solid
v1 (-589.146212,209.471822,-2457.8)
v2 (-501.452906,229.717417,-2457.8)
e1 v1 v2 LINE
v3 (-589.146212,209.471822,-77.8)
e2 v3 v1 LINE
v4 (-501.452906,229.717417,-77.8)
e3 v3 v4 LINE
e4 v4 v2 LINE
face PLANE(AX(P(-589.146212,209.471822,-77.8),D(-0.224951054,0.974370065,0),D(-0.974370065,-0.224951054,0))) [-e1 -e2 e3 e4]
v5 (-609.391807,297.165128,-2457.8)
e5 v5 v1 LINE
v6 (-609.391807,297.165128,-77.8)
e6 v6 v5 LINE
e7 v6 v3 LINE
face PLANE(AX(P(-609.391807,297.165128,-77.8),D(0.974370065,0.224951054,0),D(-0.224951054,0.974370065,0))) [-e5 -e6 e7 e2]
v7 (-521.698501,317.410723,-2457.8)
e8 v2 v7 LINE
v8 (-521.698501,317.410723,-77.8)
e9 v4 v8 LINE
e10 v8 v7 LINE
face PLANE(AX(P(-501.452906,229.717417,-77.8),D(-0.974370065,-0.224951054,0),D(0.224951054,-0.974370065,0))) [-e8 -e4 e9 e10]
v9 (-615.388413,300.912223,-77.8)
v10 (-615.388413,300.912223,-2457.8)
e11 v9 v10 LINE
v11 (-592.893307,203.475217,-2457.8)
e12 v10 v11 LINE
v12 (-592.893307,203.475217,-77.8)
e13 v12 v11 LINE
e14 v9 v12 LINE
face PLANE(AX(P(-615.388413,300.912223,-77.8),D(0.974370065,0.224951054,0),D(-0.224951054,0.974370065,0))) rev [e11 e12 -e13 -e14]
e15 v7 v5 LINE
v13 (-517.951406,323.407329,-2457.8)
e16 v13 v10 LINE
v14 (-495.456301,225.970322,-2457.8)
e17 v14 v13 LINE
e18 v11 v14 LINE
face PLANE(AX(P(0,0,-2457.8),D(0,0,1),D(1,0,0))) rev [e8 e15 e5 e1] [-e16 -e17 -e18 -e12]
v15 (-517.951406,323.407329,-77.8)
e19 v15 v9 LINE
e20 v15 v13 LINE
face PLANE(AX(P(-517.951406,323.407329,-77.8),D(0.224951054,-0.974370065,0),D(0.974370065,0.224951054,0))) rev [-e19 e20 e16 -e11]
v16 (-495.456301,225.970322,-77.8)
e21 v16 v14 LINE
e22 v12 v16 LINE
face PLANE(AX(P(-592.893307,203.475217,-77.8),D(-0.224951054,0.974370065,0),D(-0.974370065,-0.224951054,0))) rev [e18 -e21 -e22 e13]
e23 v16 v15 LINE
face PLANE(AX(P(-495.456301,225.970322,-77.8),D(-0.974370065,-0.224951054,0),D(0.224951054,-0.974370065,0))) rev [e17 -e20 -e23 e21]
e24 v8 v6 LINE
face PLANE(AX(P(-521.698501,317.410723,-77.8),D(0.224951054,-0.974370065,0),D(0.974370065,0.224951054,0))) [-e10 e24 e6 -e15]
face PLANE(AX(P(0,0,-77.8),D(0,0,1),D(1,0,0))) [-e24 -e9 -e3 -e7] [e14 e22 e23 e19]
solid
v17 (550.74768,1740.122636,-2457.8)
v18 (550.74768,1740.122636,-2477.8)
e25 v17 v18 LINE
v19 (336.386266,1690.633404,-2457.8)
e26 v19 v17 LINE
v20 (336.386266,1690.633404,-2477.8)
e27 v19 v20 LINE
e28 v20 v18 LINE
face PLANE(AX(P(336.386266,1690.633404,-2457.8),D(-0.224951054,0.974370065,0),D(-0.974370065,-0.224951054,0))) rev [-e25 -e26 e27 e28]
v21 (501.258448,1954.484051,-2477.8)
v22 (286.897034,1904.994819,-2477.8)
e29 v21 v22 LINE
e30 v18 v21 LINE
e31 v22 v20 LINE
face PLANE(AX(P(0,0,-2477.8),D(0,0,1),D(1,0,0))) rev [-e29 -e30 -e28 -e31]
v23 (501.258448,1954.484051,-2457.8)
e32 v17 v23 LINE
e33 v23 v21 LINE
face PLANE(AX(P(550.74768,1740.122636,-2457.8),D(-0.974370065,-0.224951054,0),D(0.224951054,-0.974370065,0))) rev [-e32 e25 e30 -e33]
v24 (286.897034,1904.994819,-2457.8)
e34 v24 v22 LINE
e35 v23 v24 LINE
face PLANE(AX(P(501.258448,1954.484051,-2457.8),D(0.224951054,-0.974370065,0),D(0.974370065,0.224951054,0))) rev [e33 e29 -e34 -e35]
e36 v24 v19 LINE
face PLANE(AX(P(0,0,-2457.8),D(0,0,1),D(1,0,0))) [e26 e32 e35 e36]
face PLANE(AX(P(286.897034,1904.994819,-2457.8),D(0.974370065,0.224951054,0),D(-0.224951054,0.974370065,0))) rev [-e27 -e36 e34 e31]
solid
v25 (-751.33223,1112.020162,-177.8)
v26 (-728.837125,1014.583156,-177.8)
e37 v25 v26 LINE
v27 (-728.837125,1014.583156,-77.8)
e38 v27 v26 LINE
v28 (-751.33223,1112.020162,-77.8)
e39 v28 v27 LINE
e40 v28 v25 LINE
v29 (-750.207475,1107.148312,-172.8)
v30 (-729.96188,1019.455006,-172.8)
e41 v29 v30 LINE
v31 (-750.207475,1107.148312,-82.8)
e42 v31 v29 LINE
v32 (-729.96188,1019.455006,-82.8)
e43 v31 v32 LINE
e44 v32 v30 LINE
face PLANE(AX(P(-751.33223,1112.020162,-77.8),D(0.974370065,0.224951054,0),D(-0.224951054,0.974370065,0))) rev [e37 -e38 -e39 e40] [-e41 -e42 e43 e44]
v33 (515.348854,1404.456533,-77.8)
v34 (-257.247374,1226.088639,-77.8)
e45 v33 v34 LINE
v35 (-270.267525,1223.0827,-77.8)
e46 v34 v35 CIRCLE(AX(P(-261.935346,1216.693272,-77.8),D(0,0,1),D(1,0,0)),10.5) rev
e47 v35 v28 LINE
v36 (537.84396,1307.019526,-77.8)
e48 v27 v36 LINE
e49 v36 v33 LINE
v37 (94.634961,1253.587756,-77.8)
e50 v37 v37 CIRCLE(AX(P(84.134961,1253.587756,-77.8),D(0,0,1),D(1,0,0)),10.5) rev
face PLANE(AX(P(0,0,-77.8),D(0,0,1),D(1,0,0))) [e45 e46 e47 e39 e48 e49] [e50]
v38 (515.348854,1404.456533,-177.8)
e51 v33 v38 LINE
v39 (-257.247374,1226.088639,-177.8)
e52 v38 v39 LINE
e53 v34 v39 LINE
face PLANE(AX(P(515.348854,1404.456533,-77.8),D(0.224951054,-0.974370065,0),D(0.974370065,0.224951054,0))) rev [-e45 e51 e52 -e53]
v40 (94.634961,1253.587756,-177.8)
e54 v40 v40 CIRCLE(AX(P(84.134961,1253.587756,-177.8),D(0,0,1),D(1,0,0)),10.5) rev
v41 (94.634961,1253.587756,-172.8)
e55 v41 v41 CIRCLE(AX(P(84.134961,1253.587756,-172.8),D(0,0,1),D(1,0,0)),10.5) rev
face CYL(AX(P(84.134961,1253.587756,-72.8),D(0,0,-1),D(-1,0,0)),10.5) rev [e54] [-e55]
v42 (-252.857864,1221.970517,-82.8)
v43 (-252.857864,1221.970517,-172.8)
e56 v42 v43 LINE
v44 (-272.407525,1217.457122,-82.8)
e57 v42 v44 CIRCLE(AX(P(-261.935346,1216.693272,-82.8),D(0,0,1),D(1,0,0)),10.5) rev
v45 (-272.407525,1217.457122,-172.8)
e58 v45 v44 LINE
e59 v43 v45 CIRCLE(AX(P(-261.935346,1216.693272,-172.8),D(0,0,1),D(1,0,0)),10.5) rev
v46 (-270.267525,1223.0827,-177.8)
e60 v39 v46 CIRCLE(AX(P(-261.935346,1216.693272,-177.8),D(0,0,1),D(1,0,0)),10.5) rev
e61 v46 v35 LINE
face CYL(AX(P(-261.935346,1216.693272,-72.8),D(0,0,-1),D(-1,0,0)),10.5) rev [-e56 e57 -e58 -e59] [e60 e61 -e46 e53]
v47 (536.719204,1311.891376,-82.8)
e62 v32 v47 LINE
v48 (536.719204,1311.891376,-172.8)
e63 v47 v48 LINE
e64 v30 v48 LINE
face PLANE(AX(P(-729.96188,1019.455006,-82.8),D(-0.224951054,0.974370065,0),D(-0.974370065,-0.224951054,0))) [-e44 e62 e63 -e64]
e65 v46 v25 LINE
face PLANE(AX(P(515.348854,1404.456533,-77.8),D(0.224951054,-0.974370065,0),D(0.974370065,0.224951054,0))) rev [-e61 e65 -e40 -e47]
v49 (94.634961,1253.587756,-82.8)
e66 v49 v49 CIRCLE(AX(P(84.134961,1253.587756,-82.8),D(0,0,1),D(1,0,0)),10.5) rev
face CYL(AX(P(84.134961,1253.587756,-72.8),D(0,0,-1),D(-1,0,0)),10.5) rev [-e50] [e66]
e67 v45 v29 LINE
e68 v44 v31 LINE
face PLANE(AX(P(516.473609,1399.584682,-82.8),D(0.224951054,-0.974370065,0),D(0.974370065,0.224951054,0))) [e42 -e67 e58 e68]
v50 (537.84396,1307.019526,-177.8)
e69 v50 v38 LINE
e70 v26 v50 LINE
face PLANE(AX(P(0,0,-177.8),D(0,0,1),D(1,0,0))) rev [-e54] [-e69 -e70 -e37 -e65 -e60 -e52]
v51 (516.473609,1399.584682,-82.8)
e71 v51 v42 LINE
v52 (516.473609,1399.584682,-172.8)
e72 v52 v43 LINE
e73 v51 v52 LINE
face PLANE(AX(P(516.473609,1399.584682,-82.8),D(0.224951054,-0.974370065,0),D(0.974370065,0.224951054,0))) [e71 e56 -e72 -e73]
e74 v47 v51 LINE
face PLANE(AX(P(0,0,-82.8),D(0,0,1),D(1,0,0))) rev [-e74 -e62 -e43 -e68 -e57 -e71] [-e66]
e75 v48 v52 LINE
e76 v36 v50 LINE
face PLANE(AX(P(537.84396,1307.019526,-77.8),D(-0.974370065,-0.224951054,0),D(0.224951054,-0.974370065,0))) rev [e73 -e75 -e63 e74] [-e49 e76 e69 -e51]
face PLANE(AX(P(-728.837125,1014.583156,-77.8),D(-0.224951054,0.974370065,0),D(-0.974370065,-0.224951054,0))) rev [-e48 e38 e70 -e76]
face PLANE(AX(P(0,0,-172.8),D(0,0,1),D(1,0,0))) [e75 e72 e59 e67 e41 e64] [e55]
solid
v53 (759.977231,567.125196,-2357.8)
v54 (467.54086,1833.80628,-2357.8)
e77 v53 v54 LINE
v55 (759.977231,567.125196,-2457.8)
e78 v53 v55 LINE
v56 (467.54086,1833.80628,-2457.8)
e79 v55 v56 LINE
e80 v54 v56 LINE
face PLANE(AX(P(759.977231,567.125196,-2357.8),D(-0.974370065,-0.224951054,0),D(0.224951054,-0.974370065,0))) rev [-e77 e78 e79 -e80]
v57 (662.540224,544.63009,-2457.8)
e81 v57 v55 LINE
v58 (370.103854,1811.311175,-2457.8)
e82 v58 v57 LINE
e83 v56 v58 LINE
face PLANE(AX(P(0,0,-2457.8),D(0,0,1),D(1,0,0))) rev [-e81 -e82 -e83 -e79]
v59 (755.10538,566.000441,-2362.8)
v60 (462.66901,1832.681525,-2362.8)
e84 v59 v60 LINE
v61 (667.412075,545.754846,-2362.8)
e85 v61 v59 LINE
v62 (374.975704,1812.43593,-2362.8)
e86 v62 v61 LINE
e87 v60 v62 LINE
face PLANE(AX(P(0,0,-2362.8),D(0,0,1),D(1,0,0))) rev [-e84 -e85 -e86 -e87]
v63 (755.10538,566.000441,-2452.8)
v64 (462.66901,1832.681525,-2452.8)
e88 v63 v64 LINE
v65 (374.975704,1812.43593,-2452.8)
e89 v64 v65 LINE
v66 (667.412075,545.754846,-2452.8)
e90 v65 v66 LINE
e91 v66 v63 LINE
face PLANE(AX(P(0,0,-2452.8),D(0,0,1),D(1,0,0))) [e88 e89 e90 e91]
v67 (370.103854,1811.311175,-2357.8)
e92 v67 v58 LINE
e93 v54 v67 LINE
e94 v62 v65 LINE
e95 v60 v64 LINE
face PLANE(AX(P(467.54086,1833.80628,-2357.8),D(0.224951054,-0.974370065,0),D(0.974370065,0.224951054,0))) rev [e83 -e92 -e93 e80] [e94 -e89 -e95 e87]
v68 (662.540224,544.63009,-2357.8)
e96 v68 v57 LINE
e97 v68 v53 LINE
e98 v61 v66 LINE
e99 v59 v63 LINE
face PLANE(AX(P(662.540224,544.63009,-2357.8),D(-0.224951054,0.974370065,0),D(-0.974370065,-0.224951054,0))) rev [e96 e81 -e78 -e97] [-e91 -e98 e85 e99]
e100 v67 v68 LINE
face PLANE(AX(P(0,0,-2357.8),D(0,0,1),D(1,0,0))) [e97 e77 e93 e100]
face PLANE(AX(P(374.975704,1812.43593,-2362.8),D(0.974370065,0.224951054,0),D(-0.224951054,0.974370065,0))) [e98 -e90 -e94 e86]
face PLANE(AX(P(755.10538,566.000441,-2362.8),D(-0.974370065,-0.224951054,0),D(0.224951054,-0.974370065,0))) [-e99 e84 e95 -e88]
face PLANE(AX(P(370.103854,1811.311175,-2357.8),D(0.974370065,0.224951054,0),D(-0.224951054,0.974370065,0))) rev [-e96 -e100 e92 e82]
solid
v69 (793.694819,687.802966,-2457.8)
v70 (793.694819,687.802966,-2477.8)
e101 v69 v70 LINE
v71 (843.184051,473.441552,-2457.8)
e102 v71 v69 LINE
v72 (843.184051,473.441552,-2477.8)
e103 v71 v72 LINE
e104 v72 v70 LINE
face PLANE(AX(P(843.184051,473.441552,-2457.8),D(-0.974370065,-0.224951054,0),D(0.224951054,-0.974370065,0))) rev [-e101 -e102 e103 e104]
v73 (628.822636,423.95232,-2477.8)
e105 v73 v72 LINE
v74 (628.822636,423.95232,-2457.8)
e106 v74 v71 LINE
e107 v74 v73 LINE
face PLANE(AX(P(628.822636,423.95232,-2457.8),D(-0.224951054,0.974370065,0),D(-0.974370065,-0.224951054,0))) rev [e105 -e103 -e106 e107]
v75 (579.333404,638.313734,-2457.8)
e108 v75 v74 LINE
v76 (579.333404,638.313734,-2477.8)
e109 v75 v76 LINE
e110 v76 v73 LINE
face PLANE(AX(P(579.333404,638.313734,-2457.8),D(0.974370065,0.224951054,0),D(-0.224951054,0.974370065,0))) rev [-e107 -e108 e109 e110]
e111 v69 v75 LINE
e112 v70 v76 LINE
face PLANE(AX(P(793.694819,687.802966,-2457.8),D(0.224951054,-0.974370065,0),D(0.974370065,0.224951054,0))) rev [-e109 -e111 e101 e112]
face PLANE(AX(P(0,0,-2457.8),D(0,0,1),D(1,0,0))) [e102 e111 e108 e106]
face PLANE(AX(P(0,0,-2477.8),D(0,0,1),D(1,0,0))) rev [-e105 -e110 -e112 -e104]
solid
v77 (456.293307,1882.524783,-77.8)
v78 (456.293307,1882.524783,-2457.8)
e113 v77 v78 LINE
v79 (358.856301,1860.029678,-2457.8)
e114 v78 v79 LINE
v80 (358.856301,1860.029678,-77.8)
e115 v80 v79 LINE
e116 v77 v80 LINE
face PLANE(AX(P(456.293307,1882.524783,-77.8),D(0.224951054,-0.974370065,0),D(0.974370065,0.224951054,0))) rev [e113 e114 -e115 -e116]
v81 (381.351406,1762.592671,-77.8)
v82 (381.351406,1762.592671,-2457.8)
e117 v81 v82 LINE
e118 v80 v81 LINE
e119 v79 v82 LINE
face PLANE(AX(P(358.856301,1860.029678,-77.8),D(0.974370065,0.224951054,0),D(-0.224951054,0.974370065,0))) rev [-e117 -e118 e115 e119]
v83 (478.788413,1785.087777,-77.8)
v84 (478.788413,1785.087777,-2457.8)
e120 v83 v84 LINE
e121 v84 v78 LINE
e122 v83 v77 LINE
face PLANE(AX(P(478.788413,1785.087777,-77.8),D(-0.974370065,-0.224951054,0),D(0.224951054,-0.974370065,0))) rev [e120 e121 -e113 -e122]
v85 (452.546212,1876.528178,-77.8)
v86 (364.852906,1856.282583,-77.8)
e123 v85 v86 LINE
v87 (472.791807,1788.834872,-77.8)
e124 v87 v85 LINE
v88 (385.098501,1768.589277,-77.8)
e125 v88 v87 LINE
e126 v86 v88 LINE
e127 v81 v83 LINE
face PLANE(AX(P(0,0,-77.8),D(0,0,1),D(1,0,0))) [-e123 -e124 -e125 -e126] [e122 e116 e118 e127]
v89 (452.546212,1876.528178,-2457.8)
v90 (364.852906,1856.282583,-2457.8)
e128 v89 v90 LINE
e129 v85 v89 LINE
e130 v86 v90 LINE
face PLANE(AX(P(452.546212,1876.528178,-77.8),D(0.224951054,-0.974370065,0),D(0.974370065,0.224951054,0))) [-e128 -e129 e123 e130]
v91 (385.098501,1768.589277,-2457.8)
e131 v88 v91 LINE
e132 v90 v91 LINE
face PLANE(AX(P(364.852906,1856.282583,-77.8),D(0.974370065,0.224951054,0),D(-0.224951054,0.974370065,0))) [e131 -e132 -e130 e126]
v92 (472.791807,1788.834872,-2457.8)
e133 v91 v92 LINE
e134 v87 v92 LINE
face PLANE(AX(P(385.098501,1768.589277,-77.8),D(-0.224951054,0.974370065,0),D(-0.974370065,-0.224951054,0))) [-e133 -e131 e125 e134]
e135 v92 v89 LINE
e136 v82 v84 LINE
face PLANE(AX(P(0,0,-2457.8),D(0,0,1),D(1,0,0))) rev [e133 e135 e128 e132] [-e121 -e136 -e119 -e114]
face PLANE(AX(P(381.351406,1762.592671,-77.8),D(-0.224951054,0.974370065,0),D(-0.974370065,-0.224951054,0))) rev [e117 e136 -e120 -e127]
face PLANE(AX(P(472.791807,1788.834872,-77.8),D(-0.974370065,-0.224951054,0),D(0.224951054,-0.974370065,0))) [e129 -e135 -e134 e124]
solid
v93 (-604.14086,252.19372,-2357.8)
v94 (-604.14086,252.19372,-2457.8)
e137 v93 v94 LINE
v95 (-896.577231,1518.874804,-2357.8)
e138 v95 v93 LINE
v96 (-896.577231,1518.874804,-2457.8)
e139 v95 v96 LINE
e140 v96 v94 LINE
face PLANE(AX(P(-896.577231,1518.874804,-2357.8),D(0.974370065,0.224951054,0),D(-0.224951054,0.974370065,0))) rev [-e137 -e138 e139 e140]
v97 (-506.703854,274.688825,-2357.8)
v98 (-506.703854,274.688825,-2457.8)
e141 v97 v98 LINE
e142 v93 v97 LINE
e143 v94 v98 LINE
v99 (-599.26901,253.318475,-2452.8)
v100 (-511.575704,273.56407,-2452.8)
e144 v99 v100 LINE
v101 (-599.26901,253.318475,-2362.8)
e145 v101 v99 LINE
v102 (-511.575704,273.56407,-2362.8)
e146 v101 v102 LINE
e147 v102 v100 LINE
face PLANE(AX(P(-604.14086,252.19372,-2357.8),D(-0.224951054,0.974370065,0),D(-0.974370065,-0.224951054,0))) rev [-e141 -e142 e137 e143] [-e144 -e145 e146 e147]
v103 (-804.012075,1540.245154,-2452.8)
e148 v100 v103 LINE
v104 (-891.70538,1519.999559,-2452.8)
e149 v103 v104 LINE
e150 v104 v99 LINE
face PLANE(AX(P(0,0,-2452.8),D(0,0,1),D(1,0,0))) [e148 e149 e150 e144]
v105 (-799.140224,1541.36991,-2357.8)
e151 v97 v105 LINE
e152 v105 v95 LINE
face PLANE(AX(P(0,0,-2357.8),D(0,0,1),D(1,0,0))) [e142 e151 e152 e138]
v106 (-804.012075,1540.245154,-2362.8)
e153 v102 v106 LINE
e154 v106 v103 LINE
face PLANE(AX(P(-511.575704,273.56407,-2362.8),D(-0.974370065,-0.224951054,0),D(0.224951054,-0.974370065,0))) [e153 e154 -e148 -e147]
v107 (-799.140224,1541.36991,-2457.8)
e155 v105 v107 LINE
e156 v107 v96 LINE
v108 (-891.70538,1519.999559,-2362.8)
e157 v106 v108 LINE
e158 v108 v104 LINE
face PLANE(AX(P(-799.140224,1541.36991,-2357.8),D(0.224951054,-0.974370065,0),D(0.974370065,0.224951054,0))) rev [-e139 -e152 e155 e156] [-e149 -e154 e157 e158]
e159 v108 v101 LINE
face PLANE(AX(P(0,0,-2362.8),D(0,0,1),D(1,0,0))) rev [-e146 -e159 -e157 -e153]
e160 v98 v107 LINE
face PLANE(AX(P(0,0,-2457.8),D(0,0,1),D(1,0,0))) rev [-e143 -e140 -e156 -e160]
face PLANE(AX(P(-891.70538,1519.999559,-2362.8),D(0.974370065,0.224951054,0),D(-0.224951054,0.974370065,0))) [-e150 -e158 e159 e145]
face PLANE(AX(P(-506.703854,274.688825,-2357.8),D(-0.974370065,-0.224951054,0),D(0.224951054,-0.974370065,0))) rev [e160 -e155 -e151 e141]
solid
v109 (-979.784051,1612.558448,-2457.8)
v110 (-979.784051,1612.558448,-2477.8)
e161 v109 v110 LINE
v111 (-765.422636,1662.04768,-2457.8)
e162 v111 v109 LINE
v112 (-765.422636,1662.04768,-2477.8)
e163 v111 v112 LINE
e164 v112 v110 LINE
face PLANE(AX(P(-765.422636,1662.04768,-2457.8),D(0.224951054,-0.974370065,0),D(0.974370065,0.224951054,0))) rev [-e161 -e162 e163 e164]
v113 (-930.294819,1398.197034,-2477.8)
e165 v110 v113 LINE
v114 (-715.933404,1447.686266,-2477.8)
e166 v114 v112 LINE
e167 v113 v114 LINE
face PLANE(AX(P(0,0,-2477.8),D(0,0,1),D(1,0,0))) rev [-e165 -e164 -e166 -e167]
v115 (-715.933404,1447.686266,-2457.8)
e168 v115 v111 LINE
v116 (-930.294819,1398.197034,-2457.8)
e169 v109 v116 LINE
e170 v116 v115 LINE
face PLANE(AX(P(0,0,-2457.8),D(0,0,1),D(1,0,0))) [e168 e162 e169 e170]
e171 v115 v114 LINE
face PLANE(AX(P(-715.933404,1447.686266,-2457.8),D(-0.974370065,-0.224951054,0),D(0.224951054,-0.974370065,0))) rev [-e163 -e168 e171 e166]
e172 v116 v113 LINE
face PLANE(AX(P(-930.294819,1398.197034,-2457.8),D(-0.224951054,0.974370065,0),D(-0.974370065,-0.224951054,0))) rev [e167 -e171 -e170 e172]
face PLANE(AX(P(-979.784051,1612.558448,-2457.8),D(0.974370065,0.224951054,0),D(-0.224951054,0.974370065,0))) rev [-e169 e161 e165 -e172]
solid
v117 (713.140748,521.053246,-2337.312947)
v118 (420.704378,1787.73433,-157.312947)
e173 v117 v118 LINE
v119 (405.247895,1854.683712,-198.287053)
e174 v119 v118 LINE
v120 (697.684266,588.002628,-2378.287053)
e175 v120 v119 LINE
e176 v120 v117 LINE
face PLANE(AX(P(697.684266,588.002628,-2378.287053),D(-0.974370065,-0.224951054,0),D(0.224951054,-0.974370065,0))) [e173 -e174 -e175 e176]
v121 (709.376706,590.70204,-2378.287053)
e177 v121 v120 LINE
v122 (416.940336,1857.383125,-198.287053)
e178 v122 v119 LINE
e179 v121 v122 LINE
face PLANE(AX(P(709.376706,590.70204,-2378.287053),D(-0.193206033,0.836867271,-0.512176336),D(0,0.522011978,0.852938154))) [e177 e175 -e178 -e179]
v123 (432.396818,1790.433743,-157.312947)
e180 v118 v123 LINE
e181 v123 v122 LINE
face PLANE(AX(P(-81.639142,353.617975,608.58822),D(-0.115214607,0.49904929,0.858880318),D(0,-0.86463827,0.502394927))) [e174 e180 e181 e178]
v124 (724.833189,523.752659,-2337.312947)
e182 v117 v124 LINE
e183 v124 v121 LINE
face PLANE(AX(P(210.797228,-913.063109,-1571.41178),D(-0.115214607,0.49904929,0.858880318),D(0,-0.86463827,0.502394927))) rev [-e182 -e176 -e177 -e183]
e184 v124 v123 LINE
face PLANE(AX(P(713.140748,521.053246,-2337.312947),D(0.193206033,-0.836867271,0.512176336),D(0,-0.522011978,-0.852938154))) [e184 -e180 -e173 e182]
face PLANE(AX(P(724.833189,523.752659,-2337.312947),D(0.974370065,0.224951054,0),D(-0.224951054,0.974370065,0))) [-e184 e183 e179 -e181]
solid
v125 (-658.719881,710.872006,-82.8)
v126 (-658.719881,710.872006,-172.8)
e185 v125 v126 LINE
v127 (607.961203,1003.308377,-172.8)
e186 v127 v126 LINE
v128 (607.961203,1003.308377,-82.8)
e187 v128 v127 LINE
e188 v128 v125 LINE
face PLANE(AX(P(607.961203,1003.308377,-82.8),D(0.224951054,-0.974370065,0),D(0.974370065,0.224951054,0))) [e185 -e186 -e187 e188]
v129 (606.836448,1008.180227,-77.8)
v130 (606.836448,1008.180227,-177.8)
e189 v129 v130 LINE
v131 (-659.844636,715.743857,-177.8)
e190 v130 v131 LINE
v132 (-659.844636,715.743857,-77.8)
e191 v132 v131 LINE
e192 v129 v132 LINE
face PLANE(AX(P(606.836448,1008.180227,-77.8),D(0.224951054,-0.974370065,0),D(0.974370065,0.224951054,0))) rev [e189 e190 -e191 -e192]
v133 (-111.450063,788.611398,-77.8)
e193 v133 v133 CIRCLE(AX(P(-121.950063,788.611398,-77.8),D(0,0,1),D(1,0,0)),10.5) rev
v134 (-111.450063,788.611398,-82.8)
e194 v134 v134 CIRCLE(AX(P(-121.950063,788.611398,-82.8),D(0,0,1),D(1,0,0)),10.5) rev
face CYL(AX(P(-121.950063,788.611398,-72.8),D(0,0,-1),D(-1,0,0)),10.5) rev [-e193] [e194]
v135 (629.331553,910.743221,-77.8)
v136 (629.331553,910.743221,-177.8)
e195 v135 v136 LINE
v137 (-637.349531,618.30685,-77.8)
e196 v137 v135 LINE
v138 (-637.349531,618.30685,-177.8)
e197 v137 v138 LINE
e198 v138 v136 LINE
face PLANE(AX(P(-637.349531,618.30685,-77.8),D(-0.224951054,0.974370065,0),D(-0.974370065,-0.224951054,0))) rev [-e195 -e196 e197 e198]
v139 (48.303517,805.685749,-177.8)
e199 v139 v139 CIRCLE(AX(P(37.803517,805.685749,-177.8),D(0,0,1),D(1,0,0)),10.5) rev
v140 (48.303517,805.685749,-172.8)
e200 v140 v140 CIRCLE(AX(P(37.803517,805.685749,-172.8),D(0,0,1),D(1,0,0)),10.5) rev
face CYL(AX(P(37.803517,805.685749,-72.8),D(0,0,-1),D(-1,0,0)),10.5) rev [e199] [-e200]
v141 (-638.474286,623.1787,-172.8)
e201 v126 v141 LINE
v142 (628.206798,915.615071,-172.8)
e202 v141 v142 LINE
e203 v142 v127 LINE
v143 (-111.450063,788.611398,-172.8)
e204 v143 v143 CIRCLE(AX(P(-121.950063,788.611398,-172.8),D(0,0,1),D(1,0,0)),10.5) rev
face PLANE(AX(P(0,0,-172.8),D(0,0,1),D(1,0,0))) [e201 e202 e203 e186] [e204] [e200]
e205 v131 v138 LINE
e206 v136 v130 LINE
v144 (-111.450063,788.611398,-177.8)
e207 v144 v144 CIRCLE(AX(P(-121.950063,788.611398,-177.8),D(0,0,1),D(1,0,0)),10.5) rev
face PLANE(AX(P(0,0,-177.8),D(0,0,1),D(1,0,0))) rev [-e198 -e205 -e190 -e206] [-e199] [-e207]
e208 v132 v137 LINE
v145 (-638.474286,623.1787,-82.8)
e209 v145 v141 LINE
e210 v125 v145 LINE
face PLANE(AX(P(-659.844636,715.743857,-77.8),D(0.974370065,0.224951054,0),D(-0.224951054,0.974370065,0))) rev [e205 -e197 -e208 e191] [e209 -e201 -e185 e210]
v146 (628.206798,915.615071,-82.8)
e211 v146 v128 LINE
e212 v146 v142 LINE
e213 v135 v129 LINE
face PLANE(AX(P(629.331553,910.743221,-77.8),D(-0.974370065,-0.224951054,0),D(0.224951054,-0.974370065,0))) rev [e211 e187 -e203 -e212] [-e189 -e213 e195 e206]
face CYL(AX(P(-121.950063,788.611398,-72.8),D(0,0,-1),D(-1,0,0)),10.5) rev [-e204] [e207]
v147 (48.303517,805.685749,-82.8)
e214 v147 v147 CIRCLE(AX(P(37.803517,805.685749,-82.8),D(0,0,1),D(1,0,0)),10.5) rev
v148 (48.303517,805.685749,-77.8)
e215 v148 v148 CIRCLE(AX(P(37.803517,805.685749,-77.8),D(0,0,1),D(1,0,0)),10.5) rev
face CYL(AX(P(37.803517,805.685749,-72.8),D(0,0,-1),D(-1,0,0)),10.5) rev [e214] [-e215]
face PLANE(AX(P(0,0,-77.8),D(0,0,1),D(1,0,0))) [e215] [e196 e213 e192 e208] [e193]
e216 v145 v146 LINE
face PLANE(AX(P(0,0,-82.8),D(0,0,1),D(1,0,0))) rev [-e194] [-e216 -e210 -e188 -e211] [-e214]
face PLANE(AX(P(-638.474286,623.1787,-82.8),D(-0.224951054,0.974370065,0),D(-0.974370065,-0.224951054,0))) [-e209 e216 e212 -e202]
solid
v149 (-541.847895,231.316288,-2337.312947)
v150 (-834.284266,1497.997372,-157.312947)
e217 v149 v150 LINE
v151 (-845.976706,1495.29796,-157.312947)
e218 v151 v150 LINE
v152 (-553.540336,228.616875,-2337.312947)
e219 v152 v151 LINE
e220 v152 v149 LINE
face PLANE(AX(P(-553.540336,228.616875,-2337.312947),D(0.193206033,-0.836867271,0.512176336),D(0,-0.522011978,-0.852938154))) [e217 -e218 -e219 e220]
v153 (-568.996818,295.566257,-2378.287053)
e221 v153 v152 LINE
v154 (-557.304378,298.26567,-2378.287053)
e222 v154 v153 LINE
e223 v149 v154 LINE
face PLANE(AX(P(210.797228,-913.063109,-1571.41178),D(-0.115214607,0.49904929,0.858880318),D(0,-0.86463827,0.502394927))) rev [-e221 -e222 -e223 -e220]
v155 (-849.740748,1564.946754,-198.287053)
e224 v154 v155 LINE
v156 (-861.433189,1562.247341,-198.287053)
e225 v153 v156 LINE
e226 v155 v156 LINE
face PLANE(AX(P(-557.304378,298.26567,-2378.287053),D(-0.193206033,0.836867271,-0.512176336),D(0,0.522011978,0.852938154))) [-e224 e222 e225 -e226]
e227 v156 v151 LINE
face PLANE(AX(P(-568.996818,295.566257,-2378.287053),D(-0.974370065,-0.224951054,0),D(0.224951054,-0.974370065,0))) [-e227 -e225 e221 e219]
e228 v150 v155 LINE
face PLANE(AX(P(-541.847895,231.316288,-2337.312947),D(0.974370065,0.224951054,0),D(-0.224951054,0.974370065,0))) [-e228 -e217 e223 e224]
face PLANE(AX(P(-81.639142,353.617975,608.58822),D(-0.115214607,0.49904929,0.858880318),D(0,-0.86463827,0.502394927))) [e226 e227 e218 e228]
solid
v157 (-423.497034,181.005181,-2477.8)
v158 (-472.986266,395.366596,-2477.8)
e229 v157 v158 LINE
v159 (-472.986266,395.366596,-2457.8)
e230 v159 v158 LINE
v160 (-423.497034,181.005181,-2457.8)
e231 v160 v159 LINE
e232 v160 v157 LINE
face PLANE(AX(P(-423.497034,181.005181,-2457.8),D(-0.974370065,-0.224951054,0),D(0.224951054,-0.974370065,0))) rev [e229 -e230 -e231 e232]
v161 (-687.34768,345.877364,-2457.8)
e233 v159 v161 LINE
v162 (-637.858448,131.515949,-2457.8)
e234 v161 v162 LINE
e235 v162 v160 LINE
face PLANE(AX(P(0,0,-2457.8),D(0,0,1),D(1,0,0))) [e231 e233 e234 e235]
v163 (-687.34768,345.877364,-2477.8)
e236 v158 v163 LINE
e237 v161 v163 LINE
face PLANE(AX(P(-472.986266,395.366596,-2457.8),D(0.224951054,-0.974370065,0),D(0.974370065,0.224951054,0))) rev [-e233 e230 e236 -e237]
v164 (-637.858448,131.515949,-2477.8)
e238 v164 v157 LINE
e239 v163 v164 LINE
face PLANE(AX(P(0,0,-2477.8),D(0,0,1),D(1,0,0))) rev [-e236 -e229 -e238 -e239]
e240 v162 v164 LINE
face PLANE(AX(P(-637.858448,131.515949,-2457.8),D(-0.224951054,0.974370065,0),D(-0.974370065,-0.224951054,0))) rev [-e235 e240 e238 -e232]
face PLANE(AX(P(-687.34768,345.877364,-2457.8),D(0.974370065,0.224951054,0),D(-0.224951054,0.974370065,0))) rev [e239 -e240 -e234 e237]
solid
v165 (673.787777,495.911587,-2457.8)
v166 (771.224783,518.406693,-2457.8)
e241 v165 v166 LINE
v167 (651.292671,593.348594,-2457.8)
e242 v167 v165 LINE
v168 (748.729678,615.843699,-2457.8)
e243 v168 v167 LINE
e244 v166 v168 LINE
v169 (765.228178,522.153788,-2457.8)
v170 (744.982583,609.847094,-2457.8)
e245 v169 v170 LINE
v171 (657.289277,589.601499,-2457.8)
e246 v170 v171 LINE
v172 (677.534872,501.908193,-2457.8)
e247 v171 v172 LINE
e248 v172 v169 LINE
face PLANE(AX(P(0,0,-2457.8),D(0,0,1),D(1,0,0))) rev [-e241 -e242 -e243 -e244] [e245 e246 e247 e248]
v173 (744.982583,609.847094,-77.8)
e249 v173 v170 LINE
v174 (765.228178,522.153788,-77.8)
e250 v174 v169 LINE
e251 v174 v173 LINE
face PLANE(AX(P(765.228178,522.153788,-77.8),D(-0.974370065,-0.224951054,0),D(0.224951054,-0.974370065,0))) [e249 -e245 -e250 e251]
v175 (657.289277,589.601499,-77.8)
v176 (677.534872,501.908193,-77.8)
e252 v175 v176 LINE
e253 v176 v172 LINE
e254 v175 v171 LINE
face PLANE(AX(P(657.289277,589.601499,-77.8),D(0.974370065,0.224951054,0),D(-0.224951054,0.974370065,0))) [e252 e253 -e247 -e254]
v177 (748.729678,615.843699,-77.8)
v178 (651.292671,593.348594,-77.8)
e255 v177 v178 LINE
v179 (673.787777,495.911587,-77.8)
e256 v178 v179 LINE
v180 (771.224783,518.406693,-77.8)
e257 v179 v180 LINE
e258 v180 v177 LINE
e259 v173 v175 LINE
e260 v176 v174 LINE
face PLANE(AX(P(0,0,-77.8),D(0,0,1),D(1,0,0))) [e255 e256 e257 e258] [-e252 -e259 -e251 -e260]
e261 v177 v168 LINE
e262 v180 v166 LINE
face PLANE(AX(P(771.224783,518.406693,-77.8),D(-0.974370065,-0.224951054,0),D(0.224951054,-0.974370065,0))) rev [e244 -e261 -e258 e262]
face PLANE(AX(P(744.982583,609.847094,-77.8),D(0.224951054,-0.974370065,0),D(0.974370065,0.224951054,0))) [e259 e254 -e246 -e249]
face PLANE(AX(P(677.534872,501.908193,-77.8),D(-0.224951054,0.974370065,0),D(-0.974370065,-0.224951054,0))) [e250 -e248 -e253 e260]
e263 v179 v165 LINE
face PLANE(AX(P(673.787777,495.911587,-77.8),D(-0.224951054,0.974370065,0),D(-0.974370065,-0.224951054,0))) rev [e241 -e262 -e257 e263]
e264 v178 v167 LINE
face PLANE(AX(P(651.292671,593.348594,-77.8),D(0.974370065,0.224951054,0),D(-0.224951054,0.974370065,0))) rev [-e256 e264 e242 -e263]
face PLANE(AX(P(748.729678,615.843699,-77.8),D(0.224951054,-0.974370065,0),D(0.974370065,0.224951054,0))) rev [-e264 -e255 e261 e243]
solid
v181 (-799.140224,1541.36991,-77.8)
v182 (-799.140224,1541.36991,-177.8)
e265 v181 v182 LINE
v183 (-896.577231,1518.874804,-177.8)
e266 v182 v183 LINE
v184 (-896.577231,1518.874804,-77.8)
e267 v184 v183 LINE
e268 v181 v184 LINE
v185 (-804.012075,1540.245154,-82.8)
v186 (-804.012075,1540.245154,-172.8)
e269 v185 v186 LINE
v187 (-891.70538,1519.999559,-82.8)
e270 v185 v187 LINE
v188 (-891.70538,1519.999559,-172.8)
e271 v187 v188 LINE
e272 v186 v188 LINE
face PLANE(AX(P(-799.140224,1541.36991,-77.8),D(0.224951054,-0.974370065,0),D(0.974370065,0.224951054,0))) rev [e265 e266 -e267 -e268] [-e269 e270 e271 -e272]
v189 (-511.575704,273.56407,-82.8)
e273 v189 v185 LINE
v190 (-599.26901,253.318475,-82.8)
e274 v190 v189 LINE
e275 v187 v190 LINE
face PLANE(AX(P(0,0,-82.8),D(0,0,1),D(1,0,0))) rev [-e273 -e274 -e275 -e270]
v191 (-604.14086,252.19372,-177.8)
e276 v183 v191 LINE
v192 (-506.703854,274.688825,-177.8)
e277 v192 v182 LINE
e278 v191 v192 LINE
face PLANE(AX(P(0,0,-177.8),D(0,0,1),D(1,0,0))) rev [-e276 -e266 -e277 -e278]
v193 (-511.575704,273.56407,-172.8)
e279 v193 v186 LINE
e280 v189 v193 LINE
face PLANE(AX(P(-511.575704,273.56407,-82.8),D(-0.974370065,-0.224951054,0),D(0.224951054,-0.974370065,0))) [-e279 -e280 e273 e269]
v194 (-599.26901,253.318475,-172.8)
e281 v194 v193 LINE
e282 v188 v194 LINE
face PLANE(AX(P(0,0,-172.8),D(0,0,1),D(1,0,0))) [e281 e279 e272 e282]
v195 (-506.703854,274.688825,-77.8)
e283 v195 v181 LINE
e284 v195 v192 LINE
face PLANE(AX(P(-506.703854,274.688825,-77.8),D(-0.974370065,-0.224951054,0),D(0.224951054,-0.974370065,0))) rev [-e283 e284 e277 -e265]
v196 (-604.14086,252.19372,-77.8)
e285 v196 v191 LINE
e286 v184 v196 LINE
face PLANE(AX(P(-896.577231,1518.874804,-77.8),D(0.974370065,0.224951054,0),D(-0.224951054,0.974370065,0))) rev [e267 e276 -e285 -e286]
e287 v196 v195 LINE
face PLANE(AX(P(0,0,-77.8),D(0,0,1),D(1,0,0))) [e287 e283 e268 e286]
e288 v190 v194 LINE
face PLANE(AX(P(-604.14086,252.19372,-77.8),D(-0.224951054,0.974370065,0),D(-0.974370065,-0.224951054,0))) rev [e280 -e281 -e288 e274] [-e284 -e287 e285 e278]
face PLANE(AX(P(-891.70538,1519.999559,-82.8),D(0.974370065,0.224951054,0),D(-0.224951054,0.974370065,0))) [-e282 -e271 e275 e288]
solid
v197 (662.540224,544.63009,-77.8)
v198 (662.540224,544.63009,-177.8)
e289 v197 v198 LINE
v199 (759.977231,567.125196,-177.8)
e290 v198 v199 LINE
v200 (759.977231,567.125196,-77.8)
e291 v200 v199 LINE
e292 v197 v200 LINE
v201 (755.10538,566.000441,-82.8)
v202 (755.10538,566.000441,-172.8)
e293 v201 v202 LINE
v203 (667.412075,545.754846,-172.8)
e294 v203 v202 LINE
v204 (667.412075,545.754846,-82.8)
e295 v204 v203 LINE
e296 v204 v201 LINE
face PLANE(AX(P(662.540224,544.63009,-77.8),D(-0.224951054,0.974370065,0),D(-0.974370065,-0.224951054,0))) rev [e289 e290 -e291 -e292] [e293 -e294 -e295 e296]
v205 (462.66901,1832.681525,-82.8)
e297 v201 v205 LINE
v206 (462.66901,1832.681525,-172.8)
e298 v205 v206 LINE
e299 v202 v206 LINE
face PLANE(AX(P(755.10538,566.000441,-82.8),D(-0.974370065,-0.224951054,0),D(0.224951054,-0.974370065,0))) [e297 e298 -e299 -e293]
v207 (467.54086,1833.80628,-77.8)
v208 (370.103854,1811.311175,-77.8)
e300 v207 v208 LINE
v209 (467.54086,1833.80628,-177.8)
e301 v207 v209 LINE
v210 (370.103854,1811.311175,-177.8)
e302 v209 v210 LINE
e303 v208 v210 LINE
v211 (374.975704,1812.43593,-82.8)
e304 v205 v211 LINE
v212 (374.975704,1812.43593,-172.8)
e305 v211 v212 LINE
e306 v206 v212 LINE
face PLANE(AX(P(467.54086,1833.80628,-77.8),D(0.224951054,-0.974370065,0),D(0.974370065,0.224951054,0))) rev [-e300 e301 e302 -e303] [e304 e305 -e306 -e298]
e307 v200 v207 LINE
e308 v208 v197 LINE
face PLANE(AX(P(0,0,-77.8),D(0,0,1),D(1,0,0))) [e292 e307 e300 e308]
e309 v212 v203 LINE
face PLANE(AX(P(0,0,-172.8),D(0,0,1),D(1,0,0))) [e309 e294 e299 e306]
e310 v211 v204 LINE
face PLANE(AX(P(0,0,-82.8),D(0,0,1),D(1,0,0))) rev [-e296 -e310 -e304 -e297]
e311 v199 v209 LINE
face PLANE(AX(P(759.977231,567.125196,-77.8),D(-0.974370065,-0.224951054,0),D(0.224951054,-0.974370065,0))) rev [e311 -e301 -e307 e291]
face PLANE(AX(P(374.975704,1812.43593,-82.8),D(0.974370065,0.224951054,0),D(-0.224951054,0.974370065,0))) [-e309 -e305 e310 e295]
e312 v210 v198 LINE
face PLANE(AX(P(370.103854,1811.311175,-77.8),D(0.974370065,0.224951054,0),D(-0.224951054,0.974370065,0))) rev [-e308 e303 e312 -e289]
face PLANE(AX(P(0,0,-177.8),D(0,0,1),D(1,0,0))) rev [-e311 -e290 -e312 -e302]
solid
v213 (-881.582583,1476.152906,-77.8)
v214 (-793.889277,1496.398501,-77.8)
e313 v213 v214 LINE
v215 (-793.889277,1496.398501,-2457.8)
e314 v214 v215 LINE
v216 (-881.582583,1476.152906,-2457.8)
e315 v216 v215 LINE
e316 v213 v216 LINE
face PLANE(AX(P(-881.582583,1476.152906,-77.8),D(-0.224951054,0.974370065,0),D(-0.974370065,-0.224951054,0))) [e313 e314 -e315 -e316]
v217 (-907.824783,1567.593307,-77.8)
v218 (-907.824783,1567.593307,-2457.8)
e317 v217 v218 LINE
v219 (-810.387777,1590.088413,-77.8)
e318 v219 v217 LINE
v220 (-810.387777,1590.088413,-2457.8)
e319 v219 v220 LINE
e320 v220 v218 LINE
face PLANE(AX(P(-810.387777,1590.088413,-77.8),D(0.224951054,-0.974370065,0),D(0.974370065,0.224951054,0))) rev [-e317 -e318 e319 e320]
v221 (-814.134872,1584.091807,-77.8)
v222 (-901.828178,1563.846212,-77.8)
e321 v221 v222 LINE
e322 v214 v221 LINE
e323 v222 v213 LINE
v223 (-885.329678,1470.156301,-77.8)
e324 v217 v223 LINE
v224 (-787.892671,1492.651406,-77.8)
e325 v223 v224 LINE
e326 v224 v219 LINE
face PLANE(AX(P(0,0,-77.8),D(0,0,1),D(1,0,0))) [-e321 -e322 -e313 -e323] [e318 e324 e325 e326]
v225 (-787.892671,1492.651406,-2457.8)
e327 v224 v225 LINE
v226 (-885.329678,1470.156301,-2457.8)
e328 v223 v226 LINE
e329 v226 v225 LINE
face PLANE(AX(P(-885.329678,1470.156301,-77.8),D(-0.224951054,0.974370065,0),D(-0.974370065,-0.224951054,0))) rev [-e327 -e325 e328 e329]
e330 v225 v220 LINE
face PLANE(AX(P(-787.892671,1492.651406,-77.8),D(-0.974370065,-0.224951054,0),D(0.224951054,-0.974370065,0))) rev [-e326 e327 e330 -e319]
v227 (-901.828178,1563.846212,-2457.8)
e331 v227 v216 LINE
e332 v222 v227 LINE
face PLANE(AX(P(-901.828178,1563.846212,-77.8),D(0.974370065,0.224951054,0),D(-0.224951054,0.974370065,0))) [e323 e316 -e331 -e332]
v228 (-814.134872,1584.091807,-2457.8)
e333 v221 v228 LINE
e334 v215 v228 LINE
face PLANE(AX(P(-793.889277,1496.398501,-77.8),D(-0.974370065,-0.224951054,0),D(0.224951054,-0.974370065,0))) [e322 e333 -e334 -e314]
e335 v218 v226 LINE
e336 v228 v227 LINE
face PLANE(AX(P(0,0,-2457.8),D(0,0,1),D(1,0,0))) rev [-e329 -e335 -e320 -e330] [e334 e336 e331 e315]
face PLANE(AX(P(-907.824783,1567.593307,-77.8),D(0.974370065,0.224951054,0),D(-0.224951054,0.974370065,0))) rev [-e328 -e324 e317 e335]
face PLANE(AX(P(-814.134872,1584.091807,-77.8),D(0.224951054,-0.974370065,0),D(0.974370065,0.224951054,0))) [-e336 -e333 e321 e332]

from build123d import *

# Parameters (mm, degrees)
BOSS_EXTRUDE1_START  = -2457.8
BOSS_EXTRUDE1_DEPTH  = 2380
BOSS_EXTRUDE2_START  = -2457.8
BOSS_EXTRUDE2_DEPTH  = 2380
BOSS_EXTRUDE3_START  = -2457.8
BOSS_EXTRUDE3_DEPTH  = 2380
BOSS_EXTRUDE4_START  = -2457.8
BOSS_EXTRUDE4_DEPTH  = 2380
BOSS_EXTRUDE5_START  = -2477.8
BOSS_EXTRUDE5_DEPTH  = 20
BOSS_EXTRUDE6_START  = -2477.8
BOSS_EXTRUDE6_DEPTH  = 20
BOSS_EXTRUDE7_START  = -2477.8
BOSS_EXTRUDE7_DEPTH  = 20
BOSS_EXTRUDE8_START  = -2477.8
BOSS_EXTRUDE8_DEPTH  = 20
BOSS_EXTRUDE9_START  = -177.8
BOSS_EXTRUDE9_DEPTH  = 100
BOSS_EXTRUDE10_START = -172.8
BOSS_EXTRUDE10_DEPTH = 90
BOSS_EXTRUDE11_START = -177.8
BOSS_EXTRUDE11_DEPTH = 100
BOSS_EXTRUDE12_START = -172.8
BOSS_EXTRUDE12_DEPTH = 90
BOSS_EXTRUDE13_START = -2457.8
BOSS_EXTRUDE13_DEPTH = 100
BOSS_EXTRUDE14_START = -2452.8
BOSS_EXTRUDE14_DEPTH = 90
BOSS_EXTRUDE15_START = -2457.8
BOSS_EXTRUDE15_DEPTH = 100
BOSS_EXTRUDE16_START = -2452.8
BOSS_EXTRUDE16_DEPTH = 90
BOSS_EXTRUDE17_START = -177.8
BOSS_EXTRUDE17_DEPTH = 100
BOSS_EXTRUDE18_START = -172.8
BOSS_EXTRUDE18_DEPTH = 90
BOSS_EXTRUDE19_START = -177.8
BOSS_EXTRUDE19_DEPTH = 100
BOSS_EXTRUDE20_START = -172.8
BOSS_EXTRUDE20_DEPTH = 90
BOSS_EXTRUDE21_START = -182.8
SKETCH21_R           = 10.5
BOSS_EXTRUDE21_DEPTH = 110
BOSS_EXTRUDE22_START = -182.8
SKETCH22_R           = 10.5
BOSS_EXTRUDE22_DEPTH = 110
BOSS_EXTRUDE23_START = -182.8
SKETCH23_R           = 10.5
BOSS_EXTRUDE23_DEPTH = 110
BOSS_EXTRUDE24_START = -182.8
SKETCH24_R           = 10.5
BOSS_EXTRUDE24_DEPTH = 110
BOSS_EXTRUDE25_DEPTH = 2538.188330286
BOSS_EXTRUDE26_DEPTH = 2538.188330286


with BuildPart() as part:
    # Sketch1 → Boss-Extrude1 (new body)
    with BuildSketch(Plane.XY.offset(BOSS_EXTRUDE1_START)):
        Polygon((381.351406265, 1762.592671477), (478.788412743, 1785.087776912), (456.293307309, 1882.52478339), (358.85630083, 1860.029677956), align=None)
        Polygon((385.098501317, 1768.589277073), (472.791807148, 1788.834871964), (452.546212257, 1876.528177795), (364.852906426, 1856.282582904), align=None, mode=Mode.SUBTRACT)
    extrude(amount=BOSS_EXTRUDE1_DEPTH)


with BuildPart() as body_2:
    # Sketch2 → Boss-Extrude2 (new body)
    with BuildSketch(Plane.XY.offset(BOSS_EXTRUDE2_START)):
        Polygon((673.787776912, 495.911587257), (771.22478339, 518.406692691), (748.729677956, 615.84369917), (651.292671477, 593.348593735), align=None)
        Polygon((677.534871964, 501.908192852), (765.228177795, 522.153787743), (744.982582904, 609.847093574), (657.289277073, 589.601498683), align=None, mode=Mode.SUBTRACT)
    extrude(amount=BOSS_EXTRUDE2_DEPTH)


with BuildPart() as body_3:
    # Sketch3 → Boss-Extrude3 (new body)
    with BuildSketch(Plane.XY.offset(BOSS_EXTRUDE3_START)):
        Polygon((-885.329677956, 1470.15630083), (-787.892671477, 1492.651406265), (-810.387776912, 1590.088412743), (-907.82478339, 1567.593307309), align=None)
        Polygon((-881.582582904, 1476.152906426), (-793.889277073, 1496.398501317), (-814.134871964, 1584.091807148), (-901.828177795, 1563.846212257), align=None, mode=Mode.SUBTRACT)
    extrude(amount=BOSS_EXTRUDE3_DEPTH)


with BuildPart() as body_4:
    # Sketch4 → Boss-Extrude4 (new body)
    with BuildSketch(Plane.XY.offset(BOSS_EXTRUDE4_START)):
        Polygon((-592.893307309, 203.47521661), (-495.45630083, 225.970322044), (-517.951406265, 323.407328523), (-615.388412743, 300.912223088), align=None)
        Polygon((-589.146212257, 209.471822205), (-501.452906426, 229.717417096), (-521.698501317, 317.410722927), (-609.391807148, 297.165128036), align=None, mode=Mode.SUBTRACT)
    extrude(amount=BOSS_EXTRUDE4_DEPTH)


with BuildPart() as body_5:
    # Sketch5 → Boss-Extrude5 (new body)
    with BuildSketch(Plane.XY.offset(BOSS_EXTRUDE5_START)):
        Polygon((336.386265638, 1690.63340433), (550.747679891, 1740.122636285), (501.258447935, 1954.484050538), (286.897033683, 1904.994818582), align=None)
    extrude(amount=BOSS_EXTRUDE5_DEPTH)


with BuildPart() as body_6:
    # Sketch6 → Boss-Extrude6 (new body)
    with BuildSketch(Plane.XY.offset(BOSS_EXTRUDE6_START)):
        Polygon((628.822636285, 423.952320109), (843.184050538, 473.441552065), (793.694818582, 687.802966317), (579.33340433, 638.313734362), align=None)
    extrude(amount=BOSS_EXTRUDE6_DEPTH)


with BuildPart() as body_7:
    # Sketch7 → Boss-Extrude7 (new body)
    with BuildSketch(Plane.XY.offset(BOSS_EXTRUDE7_START)):
        Polygon((-930.294818582, 1398.197033683), (-715.93340433, 1447.686265638), (-765.422636285, 1662.047679891), (-979.784050538, 1612.558447935), align=None)
    extrude(amount=BOSS_EXTRUDE7_DEPTH)


with BuildPart() as body_8:
    # Sketch8 → Boss-Extrude8 (new body)
    with BuildSketch(Plane.XY.offset(BOSS_EXTRUDE8_START)):
        Polygon((-637.858447935, 131.515949462), (-423.497033683, 181.005181418), (-472.986265638, 395.36659567), (-687.347679891, 345.877363715), align=None)
    extrude(amount=BOSS_EXTRUDE8_DEPTH)


with BuildPart() as body_9:
    # Sketch9 → Boss-Extrude9 (new body)
    with BuildSketch(Plane.XY.offset(BOSS_EXTRUDE9_START)):
        Polygon((662.540224195, 544.630090496), (759.977230673, 567.12519593), (467.540860026, 1833.806280151), (370.103853548, 1811.311174717), align=None)
    extrude(amount=BOSS_EXTRUDE9_DEPTH)


with BuildPart() as body_10:
    # Sketch10 → Boss-Extrude10 (new body)
    with BuildSketch(Plane.XY.offset(BOSS_EXTRUDE10_START)):
        Polygon((667.412074519, 545.754845768), (755.105380349, 566.000440659), (462.669009702, 1832.681524879), (374.975703872, 1812.435929988), align=None)
    extrude(amount=BOSS_EXTRUDE10_DEPTH)


with BuildPart() as body_9_1:
    add(body_9.part)

    # Combine1: cut body 10
    add(body_10.part, mode=Mode.SUBTRACT)


with BuildPart() as body_10_2:
    # Sketch11 → Boss-Extrude11 (new body)
    with BuildSketch(Plane.XY.offset(BOSS_EXTRUDE11_START)):
        Polygon((-604.140860026, 252.193719849), (-506.703853548, 274.688825283), (-799.140224195, 1541.369909504), (-896.577230673, 1518.87480407), align=None)
    extrude(amount=BOSS_EXTRUDE11_DEPTH)


with BuildPart() as body_11:
    # Sketch12 → Boss-Extrude12 (new body)
    with BuildSketch(Plane.XY.offset(BOSS_EXTRUDE12_START)):
        Polygon((-599.269009702, 253.318475121), (-511.575703872, 273.564070012), (-804.012074519, 1540.245154232), (-891.705380349, 1519.999559341), align=None)
    extrude(amount=BOSS_EXTRUDE12_DEPTH)


with BuildPart() as body_10_2_1:
    add(body_10_2.part)

    # Combine2: cut body 11
    add(body_11.part, mode=Mode.SUBTRACT)


with BuildPart() as body_11_2:
    # Sketch13 → Boss-Extrude13 (new body)
    with BuildSketch(Plane.XY.offset(BOSS_EXTRUDE13_START)):
        Polygon((662.540224195, 544.630090496), (759.977230673, 567.12519593), (467.540860026, 1833.806280151), (370.103853548, 1811.311174717), align=None)
    extrude(amount=BOSS_EXTRUDE13_DEPTH)


with BuildPart() as body_12:
    # Sketch14 → Boss-Extrude14 (new body)
    with BuildSketch(Plane.XY.offset(BOSS_EXTRUDE14_START)):
        Polygon((667.412074519, 545.754845768), (755.105380349, 566.000440659), (462.669009702, 1832.681524879), (374.975703872, 1812.435929988), align=None)
    extrude(amount=BOSS_EXTRUDE14_DEPTH)


with BuildPart() as body_11_2_1:
    add(body_11_2.part)

    # Combine3: cut body 12
    add(body_12.part, mode=Mode.SUBTRACT)


with BuildPart() as body_12_2:
    # Sketch15 → Boss-Extrude15 (new body)
    with BuildSketch(Plane.XY.offset(BOSS_EXTRUDE15_START)):
        Polygon((-604.140860026, 252.193719849), (-506.703853548, 274.688825283), (-799.140224195, 1541.369909504), (-896.577230673, 1518.87480407), align=None)
    extrude(amount=BOSS_EXTRUDE15_DEPTH)


with BuildPart() as body_13:
    # Sketch16 → Boss-Extrude16 (new body)
    with BuildSketch(Plane.XY.offset(BOSS_EXTRUDE16_START)):
        Polygon((-599.269009702, 253.318475121), (-511.575703872, 273.564070012), (-804.012074519, 1540.245154232), (-891.705380349, 1519.999559341), align=None)
    extrude(amount=BOSS_EXTRUDE16_DEPTH)


with BuildPart() as body_12_2_1:
    add(body_12_2.part)

    # Combine4: cut body 13
    add(body_13.part, mode=Mode.SUBTRACT)


with BuildPart() as body_13_2:
    # Sketch17 → Boss-Extrude17 (new body)
    with BuildSketch(Plane.XY.offset(BOSS_EXTRUDE17_START)):
        Polygon((-637.349530779, 618.306850161), (629.331553442, 910.743220808), (606.836448007, 1008.180227286), (-659.844636213, 715.743856639), align=None)
    extrude(amount=BOSS_EXTRUDE17_DEPTH)


with BuildPart() as body_14:
    # Sketch18 → Boss-Extrude18 (new body)
    with BuildSketch(Plane.XY.offset(BOSS_EXTRUDE18_START)):
        Polygon((-638.474286051, 623.178700485), (628.20679817, 915.615071132), (607.961203279, 1003.308376962), (-658.719880942, 710.872006315), align=None)
    extrude(amount=BOSS_EXTRUDE18_DEPTH)


with BuildPart() as body_13_2_1:
    add(body_13_2.part)

    # Combine5: cut body 14
    add(body_14.part, mode=Mode.SUBTRACT)


with BuildPart() as body_14_2:
    # Sketch19 → Boss-Extrude19 (new body)
    with BuildSketch(Plane.XY.offset(BOSS_EXTRUDE19_START)):
        Polygon((-728.837124581, 1014.583155509), (537.84395964, 1307.019526156), (515.348854206, 1404.456532635), (-751.332230015, 1112.020161988), align=None)
    extrude(amount=BOSS_EXTRUDE19_DEPTH)


with BuildPart() as body_15:
    # Sketch20 → Boss-Extrude20 (new body)
    with BuildSketch(Plane.XY.offset(BOSS_EXTRUDE20_START)):
        Polygon((-729.961879852, 1019.455005833), (536.719204369, 1311.89137648), (516.473609478, 1399.584682311), (-750.207474743, 1107.148311664), align=None)
    extrude(amount=BOSS_EXTRUDE20_DEPTH)


with BuildPart() as body_14_2_1:
    add(body_14_2.part)

    # Combine6: cut body 15
    add(body_15.part, mode=Mode.SUBTRACT)


with BuildPart() as body_15_2:
    # Sketch21 → Boss-Extrude21 (new body)
    with BuildSketch(Plane.XY.offset(BOSS_EXTRUDE21_START)):
        with Locations((-121.95006348, 788.611398273)):
            Circle(SKETCH21_R)
    extrude(amount=BOSS_EXTRUDE21_DEPTH)


with BuildPart() as body_13_2_2:
    add(body_13_2_1.part)

    # Combine7: cut body 15 2
    add(body_15_2.part, mode=Mode.SUBTRACT)


with BuildPart() as body_15_3:
    # Sketch22 → Boss-Extrude22 (new body)
    with BuildSketch(Plane.XY.offset(BOSS_EXTRUDE22_START)):
        with Locations((37.803517202, 805.68574919)):
            Circle(SKETCH22_R)
    extrude(amount=BOSS_EXTRUDE22_DEPTH)


with BuildPart() as body_13_2_3:
    add(body_13_2_2.part)

    # Combine8: cut body 15 3
    add(body_15_3.part, mode=Mode.SUBTRACT)


with BuildPart() as body_15_4:
    # Sketch23 → Boss-Extrude23 (new body)
    with BuildSketch(Plane.XY.offset(BOSS_EXTRUDE23_START)):
        with Locations((84.134960504, 1253.587755618)):
            Circle(SKETCH23_R)
    extrude(amount=BOSS_EXTRUDE23_DEPTH)


with BuildPart() as body_14_2_2:
    add(body_14_2_1.part)

    # Combine9: cut body 15 4
    add(body_15_4.part, mode=Mode.SUBTRACT)


with BuildPart() as body_15_5:
    # Sketch24 → Boss-Extrude24 (new body)
    with BuildSketch(Plane.XY.offset(BOSS_EXTRUDE24_START)):
        with Locations((-261.935346056, 1216.693272056)):
            Circle(SKETCH24_R)
    extrude(amount=BOSS_EXTRUDE24_DEPTH)


with BuildPart() as body_14_2_3:
    add(body_14_2_2.part)

    # Combine10: cut body 15 5
    add(body_15_5.part, mode=Mode.SUBTRACT)


with BuildPart() as body_15_6:
    # 3DSketch1 → Boss-Extrude25 (new body)
    with BuildSketch(Plane(origin=(697.684265723, 588.002627727, -2378.287053454), x_dir=(0.33560696642461146, -0.7942391255218068, 0.5065097981062415), z_dir=(-0.11521460687436719, 0.49904929004148274, 0.8588803178975969))):
        Polygon((0, 0), (79.114908229, -11.867236234), (80.894993665, 0), (1.780085435, 11.867236234), align=None)
    extrude(amount=BOSS_EXTRUDE25_DEPTH)


with BuildPart() as body_16:
    # 3DSketch3 → Boss-Extrude26 (new body)
    with BuildSketch(Plane(origin=(-568.996818498, 295.56625708, -2378.287053454), x_dir=(0.3356069664246124, -0.7942391255218055, 0.506509798106243), z_dir=(-0.11521460687437408, 0.49904929004148185, 0.8588803178975966))):
        Polygon((0, 0), (79.114908229, -11.867236234), (80.894993665, 0), (1.780085435, 11.867236234), align=None)
    extrude(amount=BOSS_EXTRUDE26_DEPTH)


solid = Compound([part.part, body_2.part, body_3.part, body_4.part, body_5.part, body_6.part, body_7.part, body_8.part, body_9_1.part, body_10_2_1.part, body_11_2_1.part, body_12_2_1.part, body_13_2_3.part, body_14_2_3.part, body_15_6.part, body_16.part])
